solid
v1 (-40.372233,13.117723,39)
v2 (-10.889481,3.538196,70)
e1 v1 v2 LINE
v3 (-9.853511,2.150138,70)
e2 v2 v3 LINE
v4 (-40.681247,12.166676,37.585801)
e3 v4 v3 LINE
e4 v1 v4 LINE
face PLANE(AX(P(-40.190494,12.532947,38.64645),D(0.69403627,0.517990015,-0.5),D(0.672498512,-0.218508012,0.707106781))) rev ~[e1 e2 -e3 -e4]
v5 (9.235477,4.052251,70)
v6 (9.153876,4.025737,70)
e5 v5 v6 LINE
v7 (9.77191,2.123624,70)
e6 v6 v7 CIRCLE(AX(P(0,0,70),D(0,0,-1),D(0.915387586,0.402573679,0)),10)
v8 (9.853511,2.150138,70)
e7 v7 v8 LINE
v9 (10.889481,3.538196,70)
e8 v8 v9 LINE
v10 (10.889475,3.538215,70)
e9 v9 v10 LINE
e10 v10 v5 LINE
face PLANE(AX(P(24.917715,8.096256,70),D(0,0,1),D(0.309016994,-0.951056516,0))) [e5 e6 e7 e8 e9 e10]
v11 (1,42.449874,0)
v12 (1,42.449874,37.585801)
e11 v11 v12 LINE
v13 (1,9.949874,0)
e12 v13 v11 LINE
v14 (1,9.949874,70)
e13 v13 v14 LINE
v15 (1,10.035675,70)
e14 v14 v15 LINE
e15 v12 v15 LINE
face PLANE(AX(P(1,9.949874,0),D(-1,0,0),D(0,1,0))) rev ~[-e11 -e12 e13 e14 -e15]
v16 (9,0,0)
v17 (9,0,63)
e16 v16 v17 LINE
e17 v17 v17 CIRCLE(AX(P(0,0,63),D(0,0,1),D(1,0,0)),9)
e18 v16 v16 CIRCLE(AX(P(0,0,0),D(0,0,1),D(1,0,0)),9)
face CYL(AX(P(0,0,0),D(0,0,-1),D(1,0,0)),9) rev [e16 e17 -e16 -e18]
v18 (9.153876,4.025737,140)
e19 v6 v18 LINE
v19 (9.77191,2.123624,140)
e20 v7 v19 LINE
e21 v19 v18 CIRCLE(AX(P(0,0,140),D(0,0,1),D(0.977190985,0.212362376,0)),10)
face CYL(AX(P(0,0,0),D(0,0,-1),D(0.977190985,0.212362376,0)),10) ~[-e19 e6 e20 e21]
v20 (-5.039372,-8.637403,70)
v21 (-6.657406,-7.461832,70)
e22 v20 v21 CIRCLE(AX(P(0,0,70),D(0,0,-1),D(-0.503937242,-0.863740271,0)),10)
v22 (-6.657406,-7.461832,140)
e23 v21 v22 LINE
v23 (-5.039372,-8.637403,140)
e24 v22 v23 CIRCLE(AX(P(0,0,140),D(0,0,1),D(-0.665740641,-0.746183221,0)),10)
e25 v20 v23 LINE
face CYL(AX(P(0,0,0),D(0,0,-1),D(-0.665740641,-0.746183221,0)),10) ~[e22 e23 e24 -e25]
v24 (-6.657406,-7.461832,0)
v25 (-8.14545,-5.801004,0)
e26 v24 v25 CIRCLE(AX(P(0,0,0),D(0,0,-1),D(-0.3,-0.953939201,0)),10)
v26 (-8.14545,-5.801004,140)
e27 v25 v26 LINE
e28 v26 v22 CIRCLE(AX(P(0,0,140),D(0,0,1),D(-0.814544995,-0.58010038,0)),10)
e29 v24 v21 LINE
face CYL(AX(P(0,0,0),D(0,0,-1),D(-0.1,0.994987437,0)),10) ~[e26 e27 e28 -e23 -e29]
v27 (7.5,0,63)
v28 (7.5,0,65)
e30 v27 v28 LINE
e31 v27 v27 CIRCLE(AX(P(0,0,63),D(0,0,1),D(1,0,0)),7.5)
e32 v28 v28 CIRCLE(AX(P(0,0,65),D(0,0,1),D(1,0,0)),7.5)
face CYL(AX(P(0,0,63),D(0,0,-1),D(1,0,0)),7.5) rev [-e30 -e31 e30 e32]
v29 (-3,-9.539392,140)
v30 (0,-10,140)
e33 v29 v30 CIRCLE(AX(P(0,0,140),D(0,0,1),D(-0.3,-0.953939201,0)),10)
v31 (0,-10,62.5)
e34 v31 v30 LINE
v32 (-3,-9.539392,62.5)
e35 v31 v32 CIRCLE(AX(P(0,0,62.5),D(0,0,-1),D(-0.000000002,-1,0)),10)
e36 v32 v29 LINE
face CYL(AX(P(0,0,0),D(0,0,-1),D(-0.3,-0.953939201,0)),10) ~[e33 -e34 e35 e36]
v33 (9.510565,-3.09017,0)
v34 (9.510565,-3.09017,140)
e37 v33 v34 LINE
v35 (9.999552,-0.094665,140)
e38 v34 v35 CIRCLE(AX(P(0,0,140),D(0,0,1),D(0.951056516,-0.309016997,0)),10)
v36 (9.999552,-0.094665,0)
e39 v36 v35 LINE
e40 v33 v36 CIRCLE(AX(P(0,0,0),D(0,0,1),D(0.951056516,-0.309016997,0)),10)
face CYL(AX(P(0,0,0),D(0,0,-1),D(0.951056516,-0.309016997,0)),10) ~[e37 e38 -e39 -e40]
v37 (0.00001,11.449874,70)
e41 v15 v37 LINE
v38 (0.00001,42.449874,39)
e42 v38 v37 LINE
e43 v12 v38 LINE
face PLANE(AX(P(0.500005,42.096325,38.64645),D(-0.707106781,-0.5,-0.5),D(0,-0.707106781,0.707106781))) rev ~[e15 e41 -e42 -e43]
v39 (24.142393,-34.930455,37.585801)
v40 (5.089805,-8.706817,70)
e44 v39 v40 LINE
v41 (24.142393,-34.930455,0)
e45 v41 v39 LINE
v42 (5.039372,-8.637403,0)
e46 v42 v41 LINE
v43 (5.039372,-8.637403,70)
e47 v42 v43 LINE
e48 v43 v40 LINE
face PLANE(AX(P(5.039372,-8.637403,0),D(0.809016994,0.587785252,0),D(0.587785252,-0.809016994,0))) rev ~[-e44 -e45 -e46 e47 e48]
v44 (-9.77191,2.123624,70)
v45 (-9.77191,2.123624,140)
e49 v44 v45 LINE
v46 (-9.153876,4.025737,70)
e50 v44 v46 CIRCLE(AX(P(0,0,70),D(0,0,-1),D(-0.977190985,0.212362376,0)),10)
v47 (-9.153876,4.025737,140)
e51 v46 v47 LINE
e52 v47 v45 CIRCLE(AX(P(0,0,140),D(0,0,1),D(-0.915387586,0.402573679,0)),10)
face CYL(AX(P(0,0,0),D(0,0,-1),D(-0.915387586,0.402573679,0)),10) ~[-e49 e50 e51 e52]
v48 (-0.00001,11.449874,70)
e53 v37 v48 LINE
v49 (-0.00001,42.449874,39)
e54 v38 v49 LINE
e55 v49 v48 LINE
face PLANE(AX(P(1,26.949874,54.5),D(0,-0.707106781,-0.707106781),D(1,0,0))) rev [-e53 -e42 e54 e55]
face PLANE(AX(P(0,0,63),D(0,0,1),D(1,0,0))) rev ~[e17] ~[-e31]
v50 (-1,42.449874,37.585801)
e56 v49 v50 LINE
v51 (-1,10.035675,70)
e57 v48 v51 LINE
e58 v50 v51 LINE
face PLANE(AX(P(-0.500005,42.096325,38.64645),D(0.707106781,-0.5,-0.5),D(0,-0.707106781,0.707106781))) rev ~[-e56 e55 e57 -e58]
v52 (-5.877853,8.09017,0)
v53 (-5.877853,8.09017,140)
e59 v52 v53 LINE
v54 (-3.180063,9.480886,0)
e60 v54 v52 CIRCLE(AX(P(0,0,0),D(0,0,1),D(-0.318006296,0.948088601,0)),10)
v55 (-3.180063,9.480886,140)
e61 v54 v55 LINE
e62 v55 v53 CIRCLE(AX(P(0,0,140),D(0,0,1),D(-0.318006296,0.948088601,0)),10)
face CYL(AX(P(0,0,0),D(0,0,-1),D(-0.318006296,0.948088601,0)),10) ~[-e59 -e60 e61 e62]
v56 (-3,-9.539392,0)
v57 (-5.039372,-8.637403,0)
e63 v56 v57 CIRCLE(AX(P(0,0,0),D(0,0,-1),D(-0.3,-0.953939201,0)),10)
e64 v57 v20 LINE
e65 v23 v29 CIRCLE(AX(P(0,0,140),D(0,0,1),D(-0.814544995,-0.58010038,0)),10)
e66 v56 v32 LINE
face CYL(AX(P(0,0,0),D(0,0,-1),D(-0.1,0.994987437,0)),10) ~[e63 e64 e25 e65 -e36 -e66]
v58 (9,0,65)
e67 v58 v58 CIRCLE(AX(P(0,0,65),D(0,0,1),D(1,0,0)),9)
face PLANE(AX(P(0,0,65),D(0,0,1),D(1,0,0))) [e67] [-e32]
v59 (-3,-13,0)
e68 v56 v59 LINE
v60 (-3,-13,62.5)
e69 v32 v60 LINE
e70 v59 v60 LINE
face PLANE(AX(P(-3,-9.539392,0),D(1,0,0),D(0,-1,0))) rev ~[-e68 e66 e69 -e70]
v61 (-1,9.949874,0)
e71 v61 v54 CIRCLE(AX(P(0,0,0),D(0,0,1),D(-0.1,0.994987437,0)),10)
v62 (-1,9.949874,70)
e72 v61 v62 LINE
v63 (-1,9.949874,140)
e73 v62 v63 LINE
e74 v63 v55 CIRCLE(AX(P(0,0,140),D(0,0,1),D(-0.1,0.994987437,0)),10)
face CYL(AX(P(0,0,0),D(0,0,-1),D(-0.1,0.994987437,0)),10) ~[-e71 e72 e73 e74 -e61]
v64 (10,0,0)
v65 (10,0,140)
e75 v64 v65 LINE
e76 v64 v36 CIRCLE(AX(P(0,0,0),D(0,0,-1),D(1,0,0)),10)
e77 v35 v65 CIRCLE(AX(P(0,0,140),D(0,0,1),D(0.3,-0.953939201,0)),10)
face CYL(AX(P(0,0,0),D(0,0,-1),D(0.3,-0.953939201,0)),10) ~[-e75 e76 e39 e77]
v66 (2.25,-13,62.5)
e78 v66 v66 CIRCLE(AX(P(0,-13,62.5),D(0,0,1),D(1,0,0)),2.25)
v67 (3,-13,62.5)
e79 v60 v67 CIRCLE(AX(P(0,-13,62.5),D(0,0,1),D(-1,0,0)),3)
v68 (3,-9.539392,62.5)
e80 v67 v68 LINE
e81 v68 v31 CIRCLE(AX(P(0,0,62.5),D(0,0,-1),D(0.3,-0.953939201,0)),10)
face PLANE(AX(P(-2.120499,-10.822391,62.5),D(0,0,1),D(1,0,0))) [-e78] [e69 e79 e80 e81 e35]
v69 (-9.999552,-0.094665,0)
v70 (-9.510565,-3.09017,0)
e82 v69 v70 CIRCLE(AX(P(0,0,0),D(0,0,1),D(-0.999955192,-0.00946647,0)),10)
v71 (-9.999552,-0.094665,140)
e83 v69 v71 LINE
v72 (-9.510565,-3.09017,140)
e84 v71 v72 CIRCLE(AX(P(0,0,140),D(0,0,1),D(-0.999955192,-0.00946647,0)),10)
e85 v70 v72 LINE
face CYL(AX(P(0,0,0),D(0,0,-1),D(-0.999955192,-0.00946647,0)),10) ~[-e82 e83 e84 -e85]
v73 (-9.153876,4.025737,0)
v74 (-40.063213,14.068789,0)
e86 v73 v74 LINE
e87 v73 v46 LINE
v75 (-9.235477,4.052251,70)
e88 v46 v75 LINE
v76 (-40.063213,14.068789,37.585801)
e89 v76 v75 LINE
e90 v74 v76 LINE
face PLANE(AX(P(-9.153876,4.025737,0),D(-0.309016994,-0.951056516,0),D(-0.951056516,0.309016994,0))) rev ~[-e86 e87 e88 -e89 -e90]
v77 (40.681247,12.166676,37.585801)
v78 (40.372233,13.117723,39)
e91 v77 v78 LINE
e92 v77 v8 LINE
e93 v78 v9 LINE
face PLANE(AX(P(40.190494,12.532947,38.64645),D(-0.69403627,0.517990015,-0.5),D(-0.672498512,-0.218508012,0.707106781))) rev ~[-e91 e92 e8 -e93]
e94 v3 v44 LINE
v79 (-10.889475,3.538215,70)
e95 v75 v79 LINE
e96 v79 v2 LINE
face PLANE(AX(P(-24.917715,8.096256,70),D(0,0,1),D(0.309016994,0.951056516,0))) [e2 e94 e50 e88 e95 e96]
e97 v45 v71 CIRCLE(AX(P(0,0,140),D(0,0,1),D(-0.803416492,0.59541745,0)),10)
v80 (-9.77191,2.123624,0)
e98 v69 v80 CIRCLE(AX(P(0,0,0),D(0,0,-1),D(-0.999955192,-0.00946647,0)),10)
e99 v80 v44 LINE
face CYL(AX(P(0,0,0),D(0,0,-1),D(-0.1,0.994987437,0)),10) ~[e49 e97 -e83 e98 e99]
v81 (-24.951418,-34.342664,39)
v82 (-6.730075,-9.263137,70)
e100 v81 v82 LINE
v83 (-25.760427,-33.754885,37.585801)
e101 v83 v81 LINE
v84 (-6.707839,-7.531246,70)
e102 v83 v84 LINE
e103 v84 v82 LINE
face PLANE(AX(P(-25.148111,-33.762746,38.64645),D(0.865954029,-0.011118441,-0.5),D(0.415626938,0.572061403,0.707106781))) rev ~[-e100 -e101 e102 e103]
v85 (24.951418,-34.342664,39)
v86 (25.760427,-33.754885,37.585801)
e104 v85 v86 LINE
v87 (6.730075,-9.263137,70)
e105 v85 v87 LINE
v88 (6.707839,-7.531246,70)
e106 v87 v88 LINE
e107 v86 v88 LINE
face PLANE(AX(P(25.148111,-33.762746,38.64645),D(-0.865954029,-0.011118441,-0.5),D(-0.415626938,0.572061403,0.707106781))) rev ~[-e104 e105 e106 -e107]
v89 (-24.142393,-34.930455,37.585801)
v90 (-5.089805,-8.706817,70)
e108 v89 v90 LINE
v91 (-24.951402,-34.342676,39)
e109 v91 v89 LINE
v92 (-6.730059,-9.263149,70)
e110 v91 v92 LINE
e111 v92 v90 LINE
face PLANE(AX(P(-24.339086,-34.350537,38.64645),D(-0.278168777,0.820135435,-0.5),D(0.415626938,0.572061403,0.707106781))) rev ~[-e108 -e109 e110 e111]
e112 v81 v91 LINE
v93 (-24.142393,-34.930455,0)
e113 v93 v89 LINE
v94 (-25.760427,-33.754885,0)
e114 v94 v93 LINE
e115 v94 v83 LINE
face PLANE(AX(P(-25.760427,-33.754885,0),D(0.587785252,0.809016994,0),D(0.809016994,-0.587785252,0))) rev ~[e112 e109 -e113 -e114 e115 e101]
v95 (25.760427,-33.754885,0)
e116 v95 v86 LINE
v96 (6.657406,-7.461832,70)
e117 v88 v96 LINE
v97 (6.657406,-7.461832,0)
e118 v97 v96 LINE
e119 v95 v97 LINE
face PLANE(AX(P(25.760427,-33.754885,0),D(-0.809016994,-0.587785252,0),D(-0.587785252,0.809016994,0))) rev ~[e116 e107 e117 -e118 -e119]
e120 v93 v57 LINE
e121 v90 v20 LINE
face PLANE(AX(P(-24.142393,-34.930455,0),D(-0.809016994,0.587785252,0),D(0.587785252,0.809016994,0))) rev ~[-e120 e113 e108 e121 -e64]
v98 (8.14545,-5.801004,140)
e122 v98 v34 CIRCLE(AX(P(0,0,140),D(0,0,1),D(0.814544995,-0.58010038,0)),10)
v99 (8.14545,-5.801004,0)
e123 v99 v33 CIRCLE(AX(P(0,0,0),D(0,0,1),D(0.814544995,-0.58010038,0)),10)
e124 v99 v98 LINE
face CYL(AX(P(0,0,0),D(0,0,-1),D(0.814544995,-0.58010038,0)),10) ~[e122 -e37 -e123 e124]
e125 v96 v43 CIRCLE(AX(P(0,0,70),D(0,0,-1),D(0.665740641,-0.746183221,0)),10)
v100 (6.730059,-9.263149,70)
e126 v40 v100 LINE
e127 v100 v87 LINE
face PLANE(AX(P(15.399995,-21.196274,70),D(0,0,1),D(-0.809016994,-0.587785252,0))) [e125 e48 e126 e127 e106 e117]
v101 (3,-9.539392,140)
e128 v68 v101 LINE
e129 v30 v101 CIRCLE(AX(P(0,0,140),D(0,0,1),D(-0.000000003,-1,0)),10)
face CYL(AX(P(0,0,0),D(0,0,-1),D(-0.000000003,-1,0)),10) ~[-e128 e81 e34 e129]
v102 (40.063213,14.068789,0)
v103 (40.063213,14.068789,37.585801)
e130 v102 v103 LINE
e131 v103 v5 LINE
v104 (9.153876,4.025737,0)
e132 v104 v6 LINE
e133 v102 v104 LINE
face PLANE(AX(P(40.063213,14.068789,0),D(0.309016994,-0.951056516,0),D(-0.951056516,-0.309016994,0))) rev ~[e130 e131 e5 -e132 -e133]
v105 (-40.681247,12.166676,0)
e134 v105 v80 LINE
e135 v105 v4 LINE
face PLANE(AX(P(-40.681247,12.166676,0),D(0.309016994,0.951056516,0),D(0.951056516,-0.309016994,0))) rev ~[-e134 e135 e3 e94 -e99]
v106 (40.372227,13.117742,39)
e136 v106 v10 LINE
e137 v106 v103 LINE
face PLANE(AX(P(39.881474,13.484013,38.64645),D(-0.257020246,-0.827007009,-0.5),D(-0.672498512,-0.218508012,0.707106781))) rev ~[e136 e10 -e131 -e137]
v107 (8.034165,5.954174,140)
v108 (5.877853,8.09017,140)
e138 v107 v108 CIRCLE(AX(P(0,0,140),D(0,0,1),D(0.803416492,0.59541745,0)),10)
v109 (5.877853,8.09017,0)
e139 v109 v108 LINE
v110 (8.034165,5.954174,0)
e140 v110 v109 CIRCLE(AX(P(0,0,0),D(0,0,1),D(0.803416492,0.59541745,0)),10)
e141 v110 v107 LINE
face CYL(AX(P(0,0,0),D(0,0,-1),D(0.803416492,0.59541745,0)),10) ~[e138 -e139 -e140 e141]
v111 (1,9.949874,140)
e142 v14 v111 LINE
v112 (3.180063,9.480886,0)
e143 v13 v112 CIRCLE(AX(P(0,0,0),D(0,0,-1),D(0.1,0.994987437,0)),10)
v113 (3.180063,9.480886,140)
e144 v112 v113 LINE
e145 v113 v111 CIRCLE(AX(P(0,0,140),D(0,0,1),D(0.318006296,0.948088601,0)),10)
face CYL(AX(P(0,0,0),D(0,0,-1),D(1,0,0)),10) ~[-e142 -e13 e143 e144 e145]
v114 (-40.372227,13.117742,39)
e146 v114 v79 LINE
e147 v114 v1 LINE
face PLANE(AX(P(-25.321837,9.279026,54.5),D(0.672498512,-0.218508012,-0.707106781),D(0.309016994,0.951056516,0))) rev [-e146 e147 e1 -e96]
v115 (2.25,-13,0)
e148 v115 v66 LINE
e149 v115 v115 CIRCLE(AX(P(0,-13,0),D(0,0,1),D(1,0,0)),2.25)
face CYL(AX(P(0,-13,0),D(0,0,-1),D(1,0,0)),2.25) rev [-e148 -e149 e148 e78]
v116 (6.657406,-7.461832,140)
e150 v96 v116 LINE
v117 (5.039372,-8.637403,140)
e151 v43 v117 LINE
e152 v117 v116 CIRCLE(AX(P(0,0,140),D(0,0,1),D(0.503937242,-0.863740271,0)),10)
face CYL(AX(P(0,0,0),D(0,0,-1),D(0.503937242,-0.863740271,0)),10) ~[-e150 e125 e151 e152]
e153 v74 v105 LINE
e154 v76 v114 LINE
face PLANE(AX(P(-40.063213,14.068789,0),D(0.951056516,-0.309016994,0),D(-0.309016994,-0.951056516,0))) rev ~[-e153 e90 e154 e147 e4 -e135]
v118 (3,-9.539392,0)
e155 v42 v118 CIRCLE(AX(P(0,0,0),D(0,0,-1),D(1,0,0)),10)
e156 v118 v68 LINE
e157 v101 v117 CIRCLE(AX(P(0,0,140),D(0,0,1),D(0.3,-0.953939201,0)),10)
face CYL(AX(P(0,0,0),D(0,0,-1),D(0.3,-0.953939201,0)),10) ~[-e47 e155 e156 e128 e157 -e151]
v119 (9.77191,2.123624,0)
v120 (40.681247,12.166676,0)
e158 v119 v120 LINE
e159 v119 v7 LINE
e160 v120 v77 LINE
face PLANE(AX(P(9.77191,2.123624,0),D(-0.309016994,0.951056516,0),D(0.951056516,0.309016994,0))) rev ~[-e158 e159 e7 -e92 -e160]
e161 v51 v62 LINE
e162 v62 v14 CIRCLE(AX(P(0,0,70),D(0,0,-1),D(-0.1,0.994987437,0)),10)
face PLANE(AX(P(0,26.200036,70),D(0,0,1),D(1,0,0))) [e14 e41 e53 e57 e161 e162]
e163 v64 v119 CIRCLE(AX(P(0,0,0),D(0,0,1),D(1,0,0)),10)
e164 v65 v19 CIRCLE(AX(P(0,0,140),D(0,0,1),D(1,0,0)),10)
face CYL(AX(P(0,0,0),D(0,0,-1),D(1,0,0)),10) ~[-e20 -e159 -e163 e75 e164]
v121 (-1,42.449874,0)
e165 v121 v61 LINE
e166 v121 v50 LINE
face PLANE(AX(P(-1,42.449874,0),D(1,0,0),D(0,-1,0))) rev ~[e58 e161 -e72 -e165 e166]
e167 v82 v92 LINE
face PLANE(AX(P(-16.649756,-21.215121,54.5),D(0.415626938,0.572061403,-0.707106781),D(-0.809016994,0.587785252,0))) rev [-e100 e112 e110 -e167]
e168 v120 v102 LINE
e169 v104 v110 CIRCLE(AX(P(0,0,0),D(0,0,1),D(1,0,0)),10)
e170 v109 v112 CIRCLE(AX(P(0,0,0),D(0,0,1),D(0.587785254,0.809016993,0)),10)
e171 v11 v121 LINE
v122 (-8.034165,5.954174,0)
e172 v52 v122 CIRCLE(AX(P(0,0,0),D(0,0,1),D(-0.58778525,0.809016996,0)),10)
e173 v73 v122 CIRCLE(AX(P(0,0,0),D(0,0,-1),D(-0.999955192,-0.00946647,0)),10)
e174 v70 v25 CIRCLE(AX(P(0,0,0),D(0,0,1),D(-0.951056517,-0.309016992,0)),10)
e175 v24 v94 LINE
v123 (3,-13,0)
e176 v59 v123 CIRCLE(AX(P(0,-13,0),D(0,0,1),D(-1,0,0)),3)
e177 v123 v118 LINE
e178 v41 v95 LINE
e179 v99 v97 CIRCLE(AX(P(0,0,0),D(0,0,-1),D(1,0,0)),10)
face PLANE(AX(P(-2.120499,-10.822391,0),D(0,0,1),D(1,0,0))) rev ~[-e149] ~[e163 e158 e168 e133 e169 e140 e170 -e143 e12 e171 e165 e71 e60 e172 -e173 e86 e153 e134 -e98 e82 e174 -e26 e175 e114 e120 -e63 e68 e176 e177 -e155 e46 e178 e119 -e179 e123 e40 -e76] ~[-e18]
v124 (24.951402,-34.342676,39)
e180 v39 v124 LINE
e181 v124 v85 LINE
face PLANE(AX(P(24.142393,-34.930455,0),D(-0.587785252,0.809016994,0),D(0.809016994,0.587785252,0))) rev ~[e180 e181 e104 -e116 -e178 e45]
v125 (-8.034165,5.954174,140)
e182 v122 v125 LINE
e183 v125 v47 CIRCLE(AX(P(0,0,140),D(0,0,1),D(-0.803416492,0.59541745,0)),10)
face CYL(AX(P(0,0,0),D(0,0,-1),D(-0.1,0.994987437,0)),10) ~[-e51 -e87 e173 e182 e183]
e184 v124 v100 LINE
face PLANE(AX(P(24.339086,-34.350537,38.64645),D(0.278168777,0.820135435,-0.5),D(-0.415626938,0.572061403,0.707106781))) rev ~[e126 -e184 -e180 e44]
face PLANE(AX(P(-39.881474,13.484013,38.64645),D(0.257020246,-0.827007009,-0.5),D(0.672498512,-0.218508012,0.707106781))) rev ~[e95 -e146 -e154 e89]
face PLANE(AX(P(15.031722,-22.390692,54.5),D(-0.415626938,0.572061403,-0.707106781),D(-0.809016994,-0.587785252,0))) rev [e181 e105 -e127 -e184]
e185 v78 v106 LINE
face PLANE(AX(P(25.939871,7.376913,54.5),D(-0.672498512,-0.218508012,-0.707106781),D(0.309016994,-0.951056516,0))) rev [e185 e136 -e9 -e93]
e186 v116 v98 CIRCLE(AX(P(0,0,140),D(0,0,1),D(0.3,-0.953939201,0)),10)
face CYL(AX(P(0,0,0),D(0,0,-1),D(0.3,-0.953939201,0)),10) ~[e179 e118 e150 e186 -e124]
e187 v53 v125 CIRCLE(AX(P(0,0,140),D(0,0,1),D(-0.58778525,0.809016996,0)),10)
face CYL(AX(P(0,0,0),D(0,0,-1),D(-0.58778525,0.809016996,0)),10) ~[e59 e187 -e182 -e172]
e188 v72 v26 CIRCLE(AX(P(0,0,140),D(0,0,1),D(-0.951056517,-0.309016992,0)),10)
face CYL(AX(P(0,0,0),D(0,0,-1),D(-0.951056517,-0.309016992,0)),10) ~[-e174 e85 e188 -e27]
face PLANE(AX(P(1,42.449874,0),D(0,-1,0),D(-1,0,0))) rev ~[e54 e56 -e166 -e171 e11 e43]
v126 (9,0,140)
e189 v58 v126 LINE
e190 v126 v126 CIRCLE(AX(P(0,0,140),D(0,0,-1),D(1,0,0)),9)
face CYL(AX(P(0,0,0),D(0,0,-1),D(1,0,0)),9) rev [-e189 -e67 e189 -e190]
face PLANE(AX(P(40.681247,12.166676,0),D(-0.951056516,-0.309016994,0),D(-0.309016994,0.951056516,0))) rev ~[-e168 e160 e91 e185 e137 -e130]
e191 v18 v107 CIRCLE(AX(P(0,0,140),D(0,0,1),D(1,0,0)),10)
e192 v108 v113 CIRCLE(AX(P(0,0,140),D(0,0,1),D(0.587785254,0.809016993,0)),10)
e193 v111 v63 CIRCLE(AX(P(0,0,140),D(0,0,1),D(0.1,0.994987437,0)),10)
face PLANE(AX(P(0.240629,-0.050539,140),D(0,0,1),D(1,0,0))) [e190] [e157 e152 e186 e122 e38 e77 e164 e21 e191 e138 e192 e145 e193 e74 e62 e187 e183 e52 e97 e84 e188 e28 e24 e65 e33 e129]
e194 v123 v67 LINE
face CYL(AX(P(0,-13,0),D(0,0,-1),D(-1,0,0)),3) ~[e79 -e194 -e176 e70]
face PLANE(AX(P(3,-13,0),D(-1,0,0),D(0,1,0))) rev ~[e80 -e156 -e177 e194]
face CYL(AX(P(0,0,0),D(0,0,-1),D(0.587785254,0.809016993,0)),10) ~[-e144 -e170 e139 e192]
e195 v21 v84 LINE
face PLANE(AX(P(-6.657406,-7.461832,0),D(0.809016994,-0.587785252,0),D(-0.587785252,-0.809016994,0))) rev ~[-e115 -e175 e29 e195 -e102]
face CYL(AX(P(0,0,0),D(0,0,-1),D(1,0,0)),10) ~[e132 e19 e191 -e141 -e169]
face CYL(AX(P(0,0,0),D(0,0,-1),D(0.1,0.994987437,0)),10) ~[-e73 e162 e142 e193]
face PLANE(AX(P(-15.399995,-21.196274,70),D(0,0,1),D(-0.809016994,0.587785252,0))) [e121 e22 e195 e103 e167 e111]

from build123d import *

# Parameters (mm, degrees)
F0_R     = 9
F1_DEPTH = 140
F2_DEPTH = 70
F3_SIZE  = 31
F4_SIZE  = 0.99999
F5_COUNT = 5
F0_R_2   = 2.25
F6_DEPTH = 62.5
F7_START = 63
F0_R_3   = 7.5
F7_DEPTH = 2


# Not quite as in the source:
# - a fillet or chamfer is up to 0.001 mm smaller than in the source, because OpenCascade refuses the exact size


with BuildPart() as f1:
    # F0 (on Top) → F1 (new body)
    with BuildSketch(Plane.XY):
        with BuildLine():
            ThreePointArc((3, -9.5393920142), (8.0622577483, -5.9160797831), (10, 0))
            ThreePointArc((10, 0), (7.4161984871, 6.7082039325), (1, 9.9498743711))
            ThreePointArc((1, 9.9498743711), (0, 10), (-1, 9.9498743711))
            ThreePointArc((-1, 9.9498743711), (-9.9477573381, 1.0208447195), (-3, -9.5393920142))
            ThreePointArc((-3, -9.5393920142), (-1.5175770051, -9.8841772563), (-2.49e-08, -10))
            ThreePointArc((-2.49e-08, -10), (1.5175769805, -9.8841772601), (3, -9.5393920142))
        make_face()
        Circle(F0_R, mode=Mode.SUBTRACT)
    extrude(amount=F1_DEPTH)

    # F0 (on Top) → F2 (join)
    with BuildSketch(Plane.XY):
        with BuildLine():
            ThreePointArc((-1, 9.9498743711), (0, 10), (1, 9.9498743711))
            Line((1, 9.9498743711), (1, 42.4498743711))
            Line((1, 42.4498743711), (-1, 42.4498743711))
            Line((-1, 42.4498743711), (-1, 9.9498743711))
        make_face()
    extrude(amount=F2_DEPTH)

    # F3
    f3_edges = [f1.edges().sort_by_distance(p)[0] for p in [
        (0, 42.449874, 70),
    ]]
    chamfer(f3_edges, length=F3_SIZE)

    # F4 (size 1 in the source; OpenCascade refuses exactly that, so slightly less here)
    f4_edges = [f1.edges().sort_by_distance(p)[0] for p in [
        (-1, 26.949874, 54.5),
        (1, 26.949874, 54.5),
    ]]
    chamfer(f4_edges, length=F4_SIZE)

    # F5: F1 ×5 about axis
    f5_axis = Axis((0, 0, 0), (0, 0, -1))


with BuildPart() as f1_1:
    add(f1.part)
    for i in range(1, F5_COUNT):
        add(f1.part.rotate(f5_axis, i * 360 / F5_COUNT))

    # F0 (on Top) → F6 (join)
    with BuildSketch(Plane.XY):
        with BuildLine():
            ThreePointArc((-3, -13), (-2.1213203524, -10.8786796652), (-2.49e-08, -10))
            ThreePointArc((-2.49e-08, -10), (-1.5175770051, -9.8841772563), (-3, -9.5393920142))
            Line((-3, -9.5393920142), (-3, -13))
        make_face()
        with BuildLine():
            Line((3, -13), (3, -9.5393920142))
            ThreePointArc((3, -9.5393920142), (1.5175769805, -9.8841772601), (-2.49e-08, -10))
            ThreePointArc((-2.49e-08, -10), (2.1213203348, -10.8786796476), (3, -13))
        make_face()
        with BuildLine():
            ThreePointArc((3, -13), (2.1213203348, -10.8786796476), (-2.49e-08, -10))
            ThreePointArc((-2.49e-08, -10), (-2.1213203524, -10.8786796652), (-3, -13))
            ThreePointArc((-3, -13), (0, -16), (3, -13))
        make_face()
        with Locations((0, -13)):
            Circle(F0_R_2, mode=Mode.SUBTRACT)
    extrude(amount=F6_DEPTH)

    # F0 (on Top) → F7 (join)
    with BuildSketch(Plane.XY.offset(F7_START)):
        Circle(F0_R)
        Circle(F0_R_3, mode=Mode.SUBTRACT)
    extrude(amount=F7_DEPTH)


solid = f1_1.part
